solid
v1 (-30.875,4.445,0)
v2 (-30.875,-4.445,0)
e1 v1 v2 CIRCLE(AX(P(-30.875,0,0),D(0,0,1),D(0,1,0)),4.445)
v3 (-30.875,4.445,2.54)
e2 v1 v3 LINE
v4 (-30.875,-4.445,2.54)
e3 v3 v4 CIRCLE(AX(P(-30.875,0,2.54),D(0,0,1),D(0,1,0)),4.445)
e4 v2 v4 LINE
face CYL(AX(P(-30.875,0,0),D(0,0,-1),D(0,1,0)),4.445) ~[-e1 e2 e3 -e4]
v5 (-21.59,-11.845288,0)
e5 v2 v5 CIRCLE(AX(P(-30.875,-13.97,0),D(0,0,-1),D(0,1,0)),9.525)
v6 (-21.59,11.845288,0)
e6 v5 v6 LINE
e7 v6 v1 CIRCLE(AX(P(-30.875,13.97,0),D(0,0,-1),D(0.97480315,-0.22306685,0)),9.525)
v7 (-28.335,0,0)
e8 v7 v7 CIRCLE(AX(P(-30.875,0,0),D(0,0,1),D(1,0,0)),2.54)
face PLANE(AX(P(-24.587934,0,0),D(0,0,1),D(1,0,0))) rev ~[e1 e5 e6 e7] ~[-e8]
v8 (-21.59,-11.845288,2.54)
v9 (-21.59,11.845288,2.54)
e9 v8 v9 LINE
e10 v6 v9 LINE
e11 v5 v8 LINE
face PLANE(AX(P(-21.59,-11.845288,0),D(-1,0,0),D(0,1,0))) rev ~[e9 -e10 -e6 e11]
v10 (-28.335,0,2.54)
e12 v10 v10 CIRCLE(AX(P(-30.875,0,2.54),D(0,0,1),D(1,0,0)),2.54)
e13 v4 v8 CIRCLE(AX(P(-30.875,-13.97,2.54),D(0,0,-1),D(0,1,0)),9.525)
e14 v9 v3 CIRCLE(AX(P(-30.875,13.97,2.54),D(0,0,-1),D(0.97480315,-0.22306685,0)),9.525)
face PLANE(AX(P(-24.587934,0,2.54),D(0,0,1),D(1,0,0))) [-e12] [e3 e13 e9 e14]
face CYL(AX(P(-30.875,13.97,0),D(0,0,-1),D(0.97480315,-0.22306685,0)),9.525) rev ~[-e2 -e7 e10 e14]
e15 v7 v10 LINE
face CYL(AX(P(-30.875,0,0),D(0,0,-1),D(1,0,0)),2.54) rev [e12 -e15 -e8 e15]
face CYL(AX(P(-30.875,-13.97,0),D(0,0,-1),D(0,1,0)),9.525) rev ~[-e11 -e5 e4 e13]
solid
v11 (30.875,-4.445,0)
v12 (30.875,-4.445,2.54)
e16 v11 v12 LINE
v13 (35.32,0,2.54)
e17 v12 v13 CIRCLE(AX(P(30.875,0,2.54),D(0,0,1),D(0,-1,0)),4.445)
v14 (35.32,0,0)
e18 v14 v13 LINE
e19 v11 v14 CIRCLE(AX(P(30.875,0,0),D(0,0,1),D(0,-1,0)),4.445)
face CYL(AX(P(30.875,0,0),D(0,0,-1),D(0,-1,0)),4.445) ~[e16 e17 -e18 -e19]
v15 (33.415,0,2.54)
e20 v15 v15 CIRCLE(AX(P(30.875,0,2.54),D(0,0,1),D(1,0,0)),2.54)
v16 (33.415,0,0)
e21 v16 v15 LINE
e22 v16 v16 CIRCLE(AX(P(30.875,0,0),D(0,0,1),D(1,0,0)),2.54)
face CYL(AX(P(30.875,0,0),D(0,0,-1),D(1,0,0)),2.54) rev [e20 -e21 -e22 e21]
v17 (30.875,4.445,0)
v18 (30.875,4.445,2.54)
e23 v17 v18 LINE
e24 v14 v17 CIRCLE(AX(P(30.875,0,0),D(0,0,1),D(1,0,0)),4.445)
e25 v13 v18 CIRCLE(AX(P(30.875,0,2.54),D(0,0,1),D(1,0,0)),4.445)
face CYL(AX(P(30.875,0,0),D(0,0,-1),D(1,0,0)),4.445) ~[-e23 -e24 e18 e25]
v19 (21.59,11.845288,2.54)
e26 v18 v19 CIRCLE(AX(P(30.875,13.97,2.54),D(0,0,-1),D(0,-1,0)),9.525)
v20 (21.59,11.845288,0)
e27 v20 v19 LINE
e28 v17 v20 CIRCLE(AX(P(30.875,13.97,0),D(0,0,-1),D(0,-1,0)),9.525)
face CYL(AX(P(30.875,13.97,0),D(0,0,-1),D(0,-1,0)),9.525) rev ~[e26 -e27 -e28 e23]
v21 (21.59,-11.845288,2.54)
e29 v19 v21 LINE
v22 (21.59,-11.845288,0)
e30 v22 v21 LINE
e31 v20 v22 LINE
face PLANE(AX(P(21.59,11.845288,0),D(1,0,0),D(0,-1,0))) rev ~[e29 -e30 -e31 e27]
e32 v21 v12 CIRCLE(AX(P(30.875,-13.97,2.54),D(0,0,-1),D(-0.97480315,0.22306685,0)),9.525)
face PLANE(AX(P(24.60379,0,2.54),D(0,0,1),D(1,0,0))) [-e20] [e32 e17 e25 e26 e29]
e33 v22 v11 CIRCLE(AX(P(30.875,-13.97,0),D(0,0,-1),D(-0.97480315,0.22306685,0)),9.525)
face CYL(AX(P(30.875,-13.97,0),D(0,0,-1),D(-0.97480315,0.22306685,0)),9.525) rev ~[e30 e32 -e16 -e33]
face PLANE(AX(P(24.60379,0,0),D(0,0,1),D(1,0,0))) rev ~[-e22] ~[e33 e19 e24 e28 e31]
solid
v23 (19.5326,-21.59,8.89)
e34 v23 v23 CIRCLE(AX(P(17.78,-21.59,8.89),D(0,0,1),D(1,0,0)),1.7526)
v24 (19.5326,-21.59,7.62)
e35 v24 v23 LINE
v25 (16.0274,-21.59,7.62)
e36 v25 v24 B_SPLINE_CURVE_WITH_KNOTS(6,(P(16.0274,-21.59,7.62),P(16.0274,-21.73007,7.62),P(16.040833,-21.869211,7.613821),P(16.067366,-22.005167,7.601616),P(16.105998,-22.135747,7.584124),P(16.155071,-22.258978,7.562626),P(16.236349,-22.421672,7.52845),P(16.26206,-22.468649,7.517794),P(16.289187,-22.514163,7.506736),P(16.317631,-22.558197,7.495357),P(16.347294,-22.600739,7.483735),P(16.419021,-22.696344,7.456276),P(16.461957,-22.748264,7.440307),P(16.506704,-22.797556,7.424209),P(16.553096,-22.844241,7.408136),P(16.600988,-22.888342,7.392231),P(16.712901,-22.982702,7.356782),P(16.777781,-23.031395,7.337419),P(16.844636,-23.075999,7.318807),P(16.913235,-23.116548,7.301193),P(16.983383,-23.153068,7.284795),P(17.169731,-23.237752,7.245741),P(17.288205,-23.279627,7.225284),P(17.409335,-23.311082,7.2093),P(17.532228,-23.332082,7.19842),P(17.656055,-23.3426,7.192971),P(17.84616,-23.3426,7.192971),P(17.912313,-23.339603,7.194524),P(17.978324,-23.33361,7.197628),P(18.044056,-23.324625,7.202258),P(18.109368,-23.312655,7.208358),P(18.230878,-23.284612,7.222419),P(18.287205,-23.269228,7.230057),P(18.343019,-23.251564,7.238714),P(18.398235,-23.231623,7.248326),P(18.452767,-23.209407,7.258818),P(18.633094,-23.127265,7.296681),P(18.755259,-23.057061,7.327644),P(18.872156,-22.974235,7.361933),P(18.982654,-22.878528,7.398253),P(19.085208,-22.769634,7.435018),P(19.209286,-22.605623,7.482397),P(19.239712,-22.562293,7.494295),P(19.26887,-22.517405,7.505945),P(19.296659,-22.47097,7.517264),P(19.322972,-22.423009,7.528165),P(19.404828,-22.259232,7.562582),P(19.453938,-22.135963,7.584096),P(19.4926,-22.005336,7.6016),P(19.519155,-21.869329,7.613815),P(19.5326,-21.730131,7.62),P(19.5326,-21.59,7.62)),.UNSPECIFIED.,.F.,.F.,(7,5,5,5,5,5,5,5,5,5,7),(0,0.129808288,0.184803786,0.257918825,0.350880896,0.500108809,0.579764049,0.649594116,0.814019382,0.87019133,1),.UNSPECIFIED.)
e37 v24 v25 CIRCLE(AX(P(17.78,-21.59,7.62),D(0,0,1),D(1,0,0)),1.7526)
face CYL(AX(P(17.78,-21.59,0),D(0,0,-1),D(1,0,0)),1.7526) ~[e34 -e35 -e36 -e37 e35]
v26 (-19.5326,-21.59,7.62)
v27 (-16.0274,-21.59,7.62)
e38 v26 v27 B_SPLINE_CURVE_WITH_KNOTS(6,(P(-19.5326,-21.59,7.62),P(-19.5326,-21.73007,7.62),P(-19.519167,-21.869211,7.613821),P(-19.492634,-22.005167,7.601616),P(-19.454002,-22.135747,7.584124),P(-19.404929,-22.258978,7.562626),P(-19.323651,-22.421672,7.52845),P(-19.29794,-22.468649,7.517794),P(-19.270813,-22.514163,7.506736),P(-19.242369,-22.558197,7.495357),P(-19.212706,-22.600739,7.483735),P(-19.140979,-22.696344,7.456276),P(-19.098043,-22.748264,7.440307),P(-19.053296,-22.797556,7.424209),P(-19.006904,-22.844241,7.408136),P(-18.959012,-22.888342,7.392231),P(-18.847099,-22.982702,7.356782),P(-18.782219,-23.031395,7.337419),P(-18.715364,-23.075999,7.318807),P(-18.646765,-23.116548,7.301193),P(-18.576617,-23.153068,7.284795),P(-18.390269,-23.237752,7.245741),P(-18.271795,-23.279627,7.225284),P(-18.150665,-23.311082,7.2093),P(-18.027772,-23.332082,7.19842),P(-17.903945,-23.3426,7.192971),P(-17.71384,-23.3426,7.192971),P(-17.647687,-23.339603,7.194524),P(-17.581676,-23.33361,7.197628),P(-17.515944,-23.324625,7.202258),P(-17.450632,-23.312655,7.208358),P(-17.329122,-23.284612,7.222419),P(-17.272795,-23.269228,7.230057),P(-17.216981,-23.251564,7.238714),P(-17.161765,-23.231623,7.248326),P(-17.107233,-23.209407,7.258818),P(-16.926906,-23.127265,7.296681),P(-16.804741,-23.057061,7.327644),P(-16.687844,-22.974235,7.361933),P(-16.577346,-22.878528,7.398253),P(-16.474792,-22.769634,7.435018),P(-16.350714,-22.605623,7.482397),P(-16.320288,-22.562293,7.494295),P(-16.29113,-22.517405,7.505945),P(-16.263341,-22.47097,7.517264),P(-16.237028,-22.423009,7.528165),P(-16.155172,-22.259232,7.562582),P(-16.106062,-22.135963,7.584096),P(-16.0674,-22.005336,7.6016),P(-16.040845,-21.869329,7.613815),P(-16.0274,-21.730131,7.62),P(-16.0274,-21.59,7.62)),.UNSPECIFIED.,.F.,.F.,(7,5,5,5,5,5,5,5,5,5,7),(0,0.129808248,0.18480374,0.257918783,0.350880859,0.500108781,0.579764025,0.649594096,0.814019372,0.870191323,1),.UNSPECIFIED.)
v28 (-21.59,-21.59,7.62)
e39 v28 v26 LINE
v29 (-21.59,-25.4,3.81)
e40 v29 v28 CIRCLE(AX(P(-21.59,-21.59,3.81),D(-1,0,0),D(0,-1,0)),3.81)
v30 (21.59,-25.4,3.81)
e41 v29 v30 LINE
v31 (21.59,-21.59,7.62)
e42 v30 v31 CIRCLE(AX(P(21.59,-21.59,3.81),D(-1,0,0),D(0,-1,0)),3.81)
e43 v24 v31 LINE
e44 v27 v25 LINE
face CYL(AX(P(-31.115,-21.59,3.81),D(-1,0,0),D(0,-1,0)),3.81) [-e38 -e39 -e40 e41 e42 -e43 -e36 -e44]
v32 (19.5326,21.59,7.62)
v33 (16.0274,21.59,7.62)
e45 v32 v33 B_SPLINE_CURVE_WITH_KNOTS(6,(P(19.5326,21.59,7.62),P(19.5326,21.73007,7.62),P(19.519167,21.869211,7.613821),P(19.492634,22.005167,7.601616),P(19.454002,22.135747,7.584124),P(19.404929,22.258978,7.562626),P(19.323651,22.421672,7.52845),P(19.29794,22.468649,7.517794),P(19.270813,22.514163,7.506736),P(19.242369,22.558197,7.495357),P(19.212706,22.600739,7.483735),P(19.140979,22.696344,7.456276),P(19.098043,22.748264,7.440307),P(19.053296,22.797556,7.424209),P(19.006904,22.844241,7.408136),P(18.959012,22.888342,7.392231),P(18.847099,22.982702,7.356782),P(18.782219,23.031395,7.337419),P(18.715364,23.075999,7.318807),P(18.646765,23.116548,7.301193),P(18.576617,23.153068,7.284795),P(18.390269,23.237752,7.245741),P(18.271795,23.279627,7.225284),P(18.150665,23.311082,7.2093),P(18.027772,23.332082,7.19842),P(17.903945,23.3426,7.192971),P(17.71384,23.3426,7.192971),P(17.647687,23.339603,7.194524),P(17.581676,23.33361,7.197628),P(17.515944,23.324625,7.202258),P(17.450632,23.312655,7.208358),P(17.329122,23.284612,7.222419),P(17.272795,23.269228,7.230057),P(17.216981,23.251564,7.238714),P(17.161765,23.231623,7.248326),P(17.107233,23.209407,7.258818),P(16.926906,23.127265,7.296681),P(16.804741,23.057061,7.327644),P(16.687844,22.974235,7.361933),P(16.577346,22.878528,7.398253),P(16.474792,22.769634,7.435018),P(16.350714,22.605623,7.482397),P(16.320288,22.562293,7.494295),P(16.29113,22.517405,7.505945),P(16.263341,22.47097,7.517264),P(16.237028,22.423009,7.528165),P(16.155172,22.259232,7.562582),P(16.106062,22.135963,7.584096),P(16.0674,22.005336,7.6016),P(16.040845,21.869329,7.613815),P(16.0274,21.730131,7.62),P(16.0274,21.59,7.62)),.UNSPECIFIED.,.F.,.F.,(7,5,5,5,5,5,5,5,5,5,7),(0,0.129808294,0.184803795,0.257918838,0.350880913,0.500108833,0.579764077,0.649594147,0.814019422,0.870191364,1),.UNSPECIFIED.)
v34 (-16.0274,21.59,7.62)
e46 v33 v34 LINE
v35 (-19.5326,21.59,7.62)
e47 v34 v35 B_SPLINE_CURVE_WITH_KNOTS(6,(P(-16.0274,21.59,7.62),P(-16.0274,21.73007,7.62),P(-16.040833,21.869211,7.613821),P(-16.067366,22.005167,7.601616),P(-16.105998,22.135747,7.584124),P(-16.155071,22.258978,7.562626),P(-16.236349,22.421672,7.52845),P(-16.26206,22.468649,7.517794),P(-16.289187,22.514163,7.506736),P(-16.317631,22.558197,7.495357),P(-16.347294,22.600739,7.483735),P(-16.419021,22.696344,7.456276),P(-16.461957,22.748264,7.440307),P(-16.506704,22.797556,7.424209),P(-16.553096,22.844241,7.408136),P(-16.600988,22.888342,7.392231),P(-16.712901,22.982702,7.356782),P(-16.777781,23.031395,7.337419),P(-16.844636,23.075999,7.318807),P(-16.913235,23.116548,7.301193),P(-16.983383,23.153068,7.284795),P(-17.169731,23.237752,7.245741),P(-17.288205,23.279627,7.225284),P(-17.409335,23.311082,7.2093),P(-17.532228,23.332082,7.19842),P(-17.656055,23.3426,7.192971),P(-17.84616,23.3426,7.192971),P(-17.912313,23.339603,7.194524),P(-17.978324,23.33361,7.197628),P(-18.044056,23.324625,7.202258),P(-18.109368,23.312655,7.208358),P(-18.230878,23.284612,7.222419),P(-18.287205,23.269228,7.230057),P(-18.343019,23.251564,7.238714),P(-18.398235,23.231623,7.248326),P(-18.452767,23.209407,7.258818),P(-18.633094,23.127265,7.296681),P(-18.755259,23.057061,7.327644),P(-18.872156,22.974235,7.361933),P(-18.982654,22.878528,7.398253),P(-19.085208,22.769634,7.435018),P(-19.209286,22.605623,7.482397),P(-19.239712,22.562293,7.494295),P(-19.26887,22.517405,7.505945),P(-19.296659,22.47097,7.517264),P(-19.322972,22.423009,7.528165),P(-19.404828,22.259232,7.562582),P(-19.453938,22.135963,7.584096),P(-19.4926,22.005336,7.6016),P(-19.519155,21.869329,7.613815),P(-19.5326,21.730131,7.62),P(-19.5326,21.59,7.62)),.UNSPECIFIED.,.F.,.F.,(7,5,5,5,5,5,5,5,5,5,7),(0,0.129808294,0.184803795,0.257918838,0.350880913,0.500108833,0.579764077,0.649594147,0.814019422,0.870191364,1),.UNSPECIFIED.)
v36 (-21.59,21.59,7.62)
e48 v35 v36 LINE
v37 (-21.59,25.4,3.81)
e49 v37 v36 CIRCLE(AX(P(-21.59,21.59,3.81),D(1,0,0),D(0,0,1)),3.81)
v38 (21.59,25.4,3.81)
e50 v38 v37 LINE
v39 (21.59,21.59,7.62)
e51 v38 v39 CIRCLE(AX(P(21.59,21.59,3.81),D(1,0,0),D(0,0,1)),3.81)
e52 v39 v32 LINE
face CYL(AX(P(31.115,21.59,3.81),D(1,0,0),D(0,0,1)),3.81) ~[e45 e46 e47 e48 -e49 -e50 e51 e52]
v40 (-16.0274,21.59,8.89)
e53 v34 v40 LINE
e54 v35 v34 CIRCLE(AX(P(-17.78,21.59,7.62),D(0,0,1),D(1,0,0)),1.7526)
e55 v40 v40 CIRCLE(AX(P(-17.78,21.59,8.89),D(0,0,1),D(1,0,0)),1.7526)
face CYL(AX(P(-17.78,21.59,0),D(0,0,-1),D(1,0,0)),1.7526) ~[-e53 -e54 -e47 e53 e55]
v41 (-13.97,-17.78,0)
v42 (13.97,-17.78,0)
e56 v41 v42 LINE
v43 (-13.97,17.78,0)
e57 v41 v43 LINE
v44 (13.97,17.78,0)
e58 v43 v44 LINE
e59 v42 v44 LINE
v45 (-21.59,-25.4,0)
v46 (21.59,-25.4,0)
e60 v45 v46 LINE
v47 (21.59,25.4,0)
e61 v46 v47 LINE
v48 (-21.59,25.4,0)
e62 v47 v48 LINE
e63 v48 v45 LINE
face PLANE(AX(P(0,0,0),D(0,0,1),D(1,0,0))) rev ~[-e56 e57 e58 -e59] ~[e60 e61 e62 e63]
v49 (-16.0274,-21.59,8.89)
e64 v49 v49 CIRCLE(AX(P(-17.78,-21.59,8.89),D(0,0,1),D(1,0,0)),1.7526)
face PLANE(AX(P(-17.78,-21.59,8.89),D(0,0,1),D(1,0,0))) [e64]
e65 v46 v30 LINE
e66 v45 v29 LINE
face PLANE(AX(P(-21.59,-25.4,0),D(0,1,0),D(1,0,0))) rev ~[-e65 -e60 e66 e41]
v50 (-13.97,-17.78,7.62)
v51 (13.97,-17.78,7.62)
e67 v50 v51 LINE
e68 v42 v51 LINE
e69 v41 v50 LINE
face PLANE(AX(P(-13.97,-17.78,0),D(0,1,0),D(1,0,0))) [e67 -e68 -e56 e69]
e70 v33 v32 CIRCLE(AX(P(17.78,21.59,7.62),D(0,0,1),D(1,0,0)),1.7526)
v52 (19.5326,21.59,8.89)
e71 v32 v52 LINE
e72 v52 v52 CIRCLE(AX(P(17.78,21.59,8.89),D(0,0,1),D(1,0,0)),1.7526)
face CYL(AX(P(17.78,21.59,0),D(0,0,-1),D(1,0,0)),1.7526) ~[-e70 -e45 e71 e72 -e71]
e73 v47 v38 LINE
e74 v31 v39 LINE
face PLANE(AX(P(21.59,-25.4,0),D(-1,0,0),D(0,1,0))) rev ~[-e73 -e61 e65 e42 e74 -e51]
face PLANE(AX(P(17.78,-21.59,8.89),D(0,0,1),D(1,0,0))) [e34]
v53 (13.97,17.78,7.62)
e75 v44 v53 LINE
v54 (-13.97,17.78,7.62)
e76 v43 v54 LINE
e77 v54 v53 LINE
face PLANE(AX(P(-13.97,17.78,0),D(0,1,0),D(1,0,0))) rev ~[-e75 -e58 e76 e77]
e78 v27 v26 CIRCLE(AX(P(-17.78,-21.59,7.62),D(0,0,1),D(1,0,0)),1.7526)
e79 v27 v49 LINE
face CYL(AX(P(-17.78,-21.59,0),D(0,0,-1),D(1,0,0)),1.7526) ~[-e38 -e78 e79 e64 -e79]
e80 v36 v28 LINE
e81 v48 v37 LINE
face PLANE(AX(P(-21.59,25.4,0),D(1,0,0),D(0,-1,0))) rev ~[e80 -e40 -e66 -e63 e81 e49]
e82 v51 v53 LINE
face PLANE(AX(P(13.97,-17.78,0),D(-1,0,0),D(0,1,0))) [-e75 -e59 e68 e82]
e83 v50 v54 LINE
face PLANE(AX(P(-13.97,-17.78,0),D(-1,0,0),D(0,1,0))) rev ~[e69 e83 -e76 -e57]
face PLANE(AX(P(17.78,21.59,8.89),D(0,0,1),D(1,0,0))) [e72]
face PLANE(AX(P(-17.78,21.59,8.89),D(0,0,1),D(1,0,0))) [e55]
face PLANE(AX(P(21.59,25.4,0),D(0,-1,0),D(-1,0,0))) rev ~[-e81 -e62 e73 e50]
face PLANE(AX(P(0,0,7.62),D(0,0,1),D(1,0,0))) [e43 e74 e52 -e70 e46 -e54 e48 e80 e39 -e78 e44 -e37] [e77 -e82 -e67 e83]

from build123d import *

# Parameters (mm, degrees)
F0_R         = 2.54
F1_DEPTH     = 2.54
F0_R_2       = 1.7526
F0_W         = 27.94
F0_H         = 35.56
F2_DEPTH     = 7.62
F3_DEPTH     = 8.89
F4_T4_DEPTH  = 62.23
F4_S5_R      = 1.7526
F4_T6_DEPTH  = 33
F4_S7_R      = 1.7526
F4_T8_DEPTH  = 33
F4_T12_DEPTH = 62.23
F4_S13_R     = 1.7526
F4_T14_DEPTH = 33
F4_S15_R     = 1.7526
F4_T16_DEPTH = 33


# Not quite as in the source:
# - a fillet or chamfer that OpenCascade refuses, or shapes differently, is made with other operations: its cross-section is extruded or revolved along the edge and cut away or added


with BuildPart() as f1:
    # F0 (on Top) → F1 (new body)
    with BuildSketch(Plane.XY):
        with BuildLine():
            ThreePointArc((-30.875, -4.445), (-24.9383449811, -6.5213926009), (-21.59, -11.8452882548))
            Line((-21.59, -11.8452882548), (-21.59, 11.8452882548))
            ThreePointArc((-21.59, 11.8452882548), (-24.9383449811, 6.5213926009), (-30.875, 4.445))
            ThreePointArc((-30.875, 4.445), (-27.7319103576, 3.1430896424), (-26.43, 0))
            ThreePointArc((-26.43, 0), (-27.7319103576, -3.1430896424), (-30.875, -4.445))
        make_face()
        with BuildLine():
            ThreePointArc((-30.875, 4.445), (-35.32, 0), (-30.875, -4.445))
            ThreePointArc((-30.875, -4.445), (-27.7319103576, -3.1430896424), (-26.43, 0))
            ThreePointArc((-26.43, 0), (-27.7319103576, 3.1430896424), (-30.875, 4.445))
        make_face()
        with Locations((-30.875, 0)):
            Circle(F0_R, mode=Mode.SUBTRACT)
    extrude(amount=F1_DEPTH)


with BuildPart() as f1b:
    # F0 (on Top) → F1, piece 2 (new body)
    with BuildSketch(Plane.XY):
        with BuildLine():
            Line((21.59, 11.8452882548), (21.59, -11.8452882548))
            ThreePointArc((21.59, -11.8452882548), (24.9383449811, -6.5213926009), (30.875, -4.445))
            ThreePointArc((30.875, -4.445), (26.43, 0), (30.875, 4.445))
            ThreePointArc((30.875, 4.445), (24.9383449811, 6.5213926009), (21.59, 11.8452882548))
        make_face()
        with BuildLine():
            ThreePointArc((30.875, 4.445), (26.43, 0), (30.875, -4.445))
            ThreePointArc((30.875, -4.445), (34.0180896424, -3.1430896424), (35.32, 0))
            ThreePointArc((35.32, 0), (34.0180896424, 3.1430896424), (30.875, 4.445))
        make_face()
        with Locations((30.875, 0)):
            Circle(F0_R, mode=Mode.SUBTRACT)
    extrude(amount=F1_DEPTH)


with BuildPart() as f2:
    # F0 (on Top) → F2 (new body)
    with BuildSketch(Plane.XY):
        Polygon((-21.59, -25.4), (21.59, -25.4), (21.59, -11.8452882548), (21.59, 11.8452882548), (21.59, 25.4), (-21.59, 25.4), (-21.59, 11.8452882548), (-21.59, -11.8452882548), align=None)
        with Locations((-17.78, -21.59)):
            Circle(F0_R_2, mode=Mode.SUBTRACT)
        with Locations((17.78, -21.59)):
            Circle(F0_R_2, mode=Mode.SUBTRACT)
        Rectangle(F0_W, F0_H, mode=Mode.SUBTRACT)
        with Locations((-17.78, 21.59)):
            Circle(F0_R_2, mode=Mode.SUBTRACT)
        with Locations((17.78, 21.59)):
            Circle(F0_R_2, mode=Mode.SUBTRACT)
    extrude(amount=F2_DEPTH)

    # F0 (on Top) → F3 (join)
    with BuildSketch(Plane.XY):
        with Locations((-17.78, 21.59)):
            Circle(F0_R_2)
        with Locations((-17.78, -21.59)):
            Circle(F0_R_2)
        with Locations((17.78, -21.59)):
            Circle(F0_R_2)
        with Locations((17.78, 21.59)):
            Circle(F0_R_2)
    extrude(amount=F3_DEPTH)

    # F4: fillet of radius 3.81 on 2 edges, made by hand


with BuildPart() as f4_tool2:
    # F4_s3 → F4_t4 (new body)
    with BuildSketch(Plane.YZ.offset(-31.115)):
        with BuildLine():
            ThreePointArc((-25.4, 3.81), (-24.2840768363, 6.5040768363), (-21.59, 7.62))
            Line((-21.59, 7.62), (-25.4, 7.62))
            Line((-25.4, 7.62), (-25.4, 3.81))
        make_face()
    extrude(amount=F4_T4_DEPTH)

    # F4_s5 → F4_t6 (cut, symmetric)
    with BuildSketch(Plane.XY.offset(5.7)):
        with Locations((-17.78, -21.59)):
            Circle(F4_S5_R)
    extrude(amount=F4_T6_DEPTH, both=True, mode=Mode.SUBTRACT)

    # F4_s7 → F4_t8 (cut, symmetric)
    with BuildSketch(Plane.XY.offset(5.7)):
        with Locations((17.78, -21.59)):
            Circle(F4_S7_R)
    extrude(amount=F4_T8_DEPTH, both=True, mode=Mode.SUBTRACT)


with BuildPart() as f2_1:
    add(f2.part)

    # F4_t1: cut F4_tool2
    add(f4_tool2.part, mode=Mode.SUBTRACT)


with BuildPart() as f4_tool10:
    # F4_s11 → F4_t12 (new body)
    with BuildSketch(Plane.YZ.offset(31.115)):
        with BuildLine():
            ThreePointArc((21.59, 7.62), (24.2840768363, 6.5040768363), (25.4, 3.81))
            Line((25.4, 3.81), (25.4, 7.62))
            Line((25.4, 7.62), (21.59, 7.62))
        make_face()
    extrude(amount=-F4_T12_DEPTH)

    # F4_s13 → F4_t14 (cut, symmetric)
    with BuildSketch(Plane.XY.offset(5.7)):
        with Locations((-17.78, 21.59)):
            Circle(F4_S13_R)
    extrude(amount=F4_T14_DEPTH, both=True, mode=Mode.SUBTRACT)

    # F4_s15 → F4_t16 (cut, symmetric)
    with BuildSketch(Plane.XY.offset(5.7)):
        with Locations((17.78, 21.59)):
            Circle(F4_S15_R)
    extrude(amount=F4_T16_DEPTH, both=True, mode=Mode.SUBTRACT)


with BuildPart() as f2_2:
    add(f2_1.part)

    # F4_t9: cut F4_tool10
    add(f4_tool10.part, mode=Mode.SUBTRACT)


solid = Compound([f1.part, f1b.part, f2_2.part])
